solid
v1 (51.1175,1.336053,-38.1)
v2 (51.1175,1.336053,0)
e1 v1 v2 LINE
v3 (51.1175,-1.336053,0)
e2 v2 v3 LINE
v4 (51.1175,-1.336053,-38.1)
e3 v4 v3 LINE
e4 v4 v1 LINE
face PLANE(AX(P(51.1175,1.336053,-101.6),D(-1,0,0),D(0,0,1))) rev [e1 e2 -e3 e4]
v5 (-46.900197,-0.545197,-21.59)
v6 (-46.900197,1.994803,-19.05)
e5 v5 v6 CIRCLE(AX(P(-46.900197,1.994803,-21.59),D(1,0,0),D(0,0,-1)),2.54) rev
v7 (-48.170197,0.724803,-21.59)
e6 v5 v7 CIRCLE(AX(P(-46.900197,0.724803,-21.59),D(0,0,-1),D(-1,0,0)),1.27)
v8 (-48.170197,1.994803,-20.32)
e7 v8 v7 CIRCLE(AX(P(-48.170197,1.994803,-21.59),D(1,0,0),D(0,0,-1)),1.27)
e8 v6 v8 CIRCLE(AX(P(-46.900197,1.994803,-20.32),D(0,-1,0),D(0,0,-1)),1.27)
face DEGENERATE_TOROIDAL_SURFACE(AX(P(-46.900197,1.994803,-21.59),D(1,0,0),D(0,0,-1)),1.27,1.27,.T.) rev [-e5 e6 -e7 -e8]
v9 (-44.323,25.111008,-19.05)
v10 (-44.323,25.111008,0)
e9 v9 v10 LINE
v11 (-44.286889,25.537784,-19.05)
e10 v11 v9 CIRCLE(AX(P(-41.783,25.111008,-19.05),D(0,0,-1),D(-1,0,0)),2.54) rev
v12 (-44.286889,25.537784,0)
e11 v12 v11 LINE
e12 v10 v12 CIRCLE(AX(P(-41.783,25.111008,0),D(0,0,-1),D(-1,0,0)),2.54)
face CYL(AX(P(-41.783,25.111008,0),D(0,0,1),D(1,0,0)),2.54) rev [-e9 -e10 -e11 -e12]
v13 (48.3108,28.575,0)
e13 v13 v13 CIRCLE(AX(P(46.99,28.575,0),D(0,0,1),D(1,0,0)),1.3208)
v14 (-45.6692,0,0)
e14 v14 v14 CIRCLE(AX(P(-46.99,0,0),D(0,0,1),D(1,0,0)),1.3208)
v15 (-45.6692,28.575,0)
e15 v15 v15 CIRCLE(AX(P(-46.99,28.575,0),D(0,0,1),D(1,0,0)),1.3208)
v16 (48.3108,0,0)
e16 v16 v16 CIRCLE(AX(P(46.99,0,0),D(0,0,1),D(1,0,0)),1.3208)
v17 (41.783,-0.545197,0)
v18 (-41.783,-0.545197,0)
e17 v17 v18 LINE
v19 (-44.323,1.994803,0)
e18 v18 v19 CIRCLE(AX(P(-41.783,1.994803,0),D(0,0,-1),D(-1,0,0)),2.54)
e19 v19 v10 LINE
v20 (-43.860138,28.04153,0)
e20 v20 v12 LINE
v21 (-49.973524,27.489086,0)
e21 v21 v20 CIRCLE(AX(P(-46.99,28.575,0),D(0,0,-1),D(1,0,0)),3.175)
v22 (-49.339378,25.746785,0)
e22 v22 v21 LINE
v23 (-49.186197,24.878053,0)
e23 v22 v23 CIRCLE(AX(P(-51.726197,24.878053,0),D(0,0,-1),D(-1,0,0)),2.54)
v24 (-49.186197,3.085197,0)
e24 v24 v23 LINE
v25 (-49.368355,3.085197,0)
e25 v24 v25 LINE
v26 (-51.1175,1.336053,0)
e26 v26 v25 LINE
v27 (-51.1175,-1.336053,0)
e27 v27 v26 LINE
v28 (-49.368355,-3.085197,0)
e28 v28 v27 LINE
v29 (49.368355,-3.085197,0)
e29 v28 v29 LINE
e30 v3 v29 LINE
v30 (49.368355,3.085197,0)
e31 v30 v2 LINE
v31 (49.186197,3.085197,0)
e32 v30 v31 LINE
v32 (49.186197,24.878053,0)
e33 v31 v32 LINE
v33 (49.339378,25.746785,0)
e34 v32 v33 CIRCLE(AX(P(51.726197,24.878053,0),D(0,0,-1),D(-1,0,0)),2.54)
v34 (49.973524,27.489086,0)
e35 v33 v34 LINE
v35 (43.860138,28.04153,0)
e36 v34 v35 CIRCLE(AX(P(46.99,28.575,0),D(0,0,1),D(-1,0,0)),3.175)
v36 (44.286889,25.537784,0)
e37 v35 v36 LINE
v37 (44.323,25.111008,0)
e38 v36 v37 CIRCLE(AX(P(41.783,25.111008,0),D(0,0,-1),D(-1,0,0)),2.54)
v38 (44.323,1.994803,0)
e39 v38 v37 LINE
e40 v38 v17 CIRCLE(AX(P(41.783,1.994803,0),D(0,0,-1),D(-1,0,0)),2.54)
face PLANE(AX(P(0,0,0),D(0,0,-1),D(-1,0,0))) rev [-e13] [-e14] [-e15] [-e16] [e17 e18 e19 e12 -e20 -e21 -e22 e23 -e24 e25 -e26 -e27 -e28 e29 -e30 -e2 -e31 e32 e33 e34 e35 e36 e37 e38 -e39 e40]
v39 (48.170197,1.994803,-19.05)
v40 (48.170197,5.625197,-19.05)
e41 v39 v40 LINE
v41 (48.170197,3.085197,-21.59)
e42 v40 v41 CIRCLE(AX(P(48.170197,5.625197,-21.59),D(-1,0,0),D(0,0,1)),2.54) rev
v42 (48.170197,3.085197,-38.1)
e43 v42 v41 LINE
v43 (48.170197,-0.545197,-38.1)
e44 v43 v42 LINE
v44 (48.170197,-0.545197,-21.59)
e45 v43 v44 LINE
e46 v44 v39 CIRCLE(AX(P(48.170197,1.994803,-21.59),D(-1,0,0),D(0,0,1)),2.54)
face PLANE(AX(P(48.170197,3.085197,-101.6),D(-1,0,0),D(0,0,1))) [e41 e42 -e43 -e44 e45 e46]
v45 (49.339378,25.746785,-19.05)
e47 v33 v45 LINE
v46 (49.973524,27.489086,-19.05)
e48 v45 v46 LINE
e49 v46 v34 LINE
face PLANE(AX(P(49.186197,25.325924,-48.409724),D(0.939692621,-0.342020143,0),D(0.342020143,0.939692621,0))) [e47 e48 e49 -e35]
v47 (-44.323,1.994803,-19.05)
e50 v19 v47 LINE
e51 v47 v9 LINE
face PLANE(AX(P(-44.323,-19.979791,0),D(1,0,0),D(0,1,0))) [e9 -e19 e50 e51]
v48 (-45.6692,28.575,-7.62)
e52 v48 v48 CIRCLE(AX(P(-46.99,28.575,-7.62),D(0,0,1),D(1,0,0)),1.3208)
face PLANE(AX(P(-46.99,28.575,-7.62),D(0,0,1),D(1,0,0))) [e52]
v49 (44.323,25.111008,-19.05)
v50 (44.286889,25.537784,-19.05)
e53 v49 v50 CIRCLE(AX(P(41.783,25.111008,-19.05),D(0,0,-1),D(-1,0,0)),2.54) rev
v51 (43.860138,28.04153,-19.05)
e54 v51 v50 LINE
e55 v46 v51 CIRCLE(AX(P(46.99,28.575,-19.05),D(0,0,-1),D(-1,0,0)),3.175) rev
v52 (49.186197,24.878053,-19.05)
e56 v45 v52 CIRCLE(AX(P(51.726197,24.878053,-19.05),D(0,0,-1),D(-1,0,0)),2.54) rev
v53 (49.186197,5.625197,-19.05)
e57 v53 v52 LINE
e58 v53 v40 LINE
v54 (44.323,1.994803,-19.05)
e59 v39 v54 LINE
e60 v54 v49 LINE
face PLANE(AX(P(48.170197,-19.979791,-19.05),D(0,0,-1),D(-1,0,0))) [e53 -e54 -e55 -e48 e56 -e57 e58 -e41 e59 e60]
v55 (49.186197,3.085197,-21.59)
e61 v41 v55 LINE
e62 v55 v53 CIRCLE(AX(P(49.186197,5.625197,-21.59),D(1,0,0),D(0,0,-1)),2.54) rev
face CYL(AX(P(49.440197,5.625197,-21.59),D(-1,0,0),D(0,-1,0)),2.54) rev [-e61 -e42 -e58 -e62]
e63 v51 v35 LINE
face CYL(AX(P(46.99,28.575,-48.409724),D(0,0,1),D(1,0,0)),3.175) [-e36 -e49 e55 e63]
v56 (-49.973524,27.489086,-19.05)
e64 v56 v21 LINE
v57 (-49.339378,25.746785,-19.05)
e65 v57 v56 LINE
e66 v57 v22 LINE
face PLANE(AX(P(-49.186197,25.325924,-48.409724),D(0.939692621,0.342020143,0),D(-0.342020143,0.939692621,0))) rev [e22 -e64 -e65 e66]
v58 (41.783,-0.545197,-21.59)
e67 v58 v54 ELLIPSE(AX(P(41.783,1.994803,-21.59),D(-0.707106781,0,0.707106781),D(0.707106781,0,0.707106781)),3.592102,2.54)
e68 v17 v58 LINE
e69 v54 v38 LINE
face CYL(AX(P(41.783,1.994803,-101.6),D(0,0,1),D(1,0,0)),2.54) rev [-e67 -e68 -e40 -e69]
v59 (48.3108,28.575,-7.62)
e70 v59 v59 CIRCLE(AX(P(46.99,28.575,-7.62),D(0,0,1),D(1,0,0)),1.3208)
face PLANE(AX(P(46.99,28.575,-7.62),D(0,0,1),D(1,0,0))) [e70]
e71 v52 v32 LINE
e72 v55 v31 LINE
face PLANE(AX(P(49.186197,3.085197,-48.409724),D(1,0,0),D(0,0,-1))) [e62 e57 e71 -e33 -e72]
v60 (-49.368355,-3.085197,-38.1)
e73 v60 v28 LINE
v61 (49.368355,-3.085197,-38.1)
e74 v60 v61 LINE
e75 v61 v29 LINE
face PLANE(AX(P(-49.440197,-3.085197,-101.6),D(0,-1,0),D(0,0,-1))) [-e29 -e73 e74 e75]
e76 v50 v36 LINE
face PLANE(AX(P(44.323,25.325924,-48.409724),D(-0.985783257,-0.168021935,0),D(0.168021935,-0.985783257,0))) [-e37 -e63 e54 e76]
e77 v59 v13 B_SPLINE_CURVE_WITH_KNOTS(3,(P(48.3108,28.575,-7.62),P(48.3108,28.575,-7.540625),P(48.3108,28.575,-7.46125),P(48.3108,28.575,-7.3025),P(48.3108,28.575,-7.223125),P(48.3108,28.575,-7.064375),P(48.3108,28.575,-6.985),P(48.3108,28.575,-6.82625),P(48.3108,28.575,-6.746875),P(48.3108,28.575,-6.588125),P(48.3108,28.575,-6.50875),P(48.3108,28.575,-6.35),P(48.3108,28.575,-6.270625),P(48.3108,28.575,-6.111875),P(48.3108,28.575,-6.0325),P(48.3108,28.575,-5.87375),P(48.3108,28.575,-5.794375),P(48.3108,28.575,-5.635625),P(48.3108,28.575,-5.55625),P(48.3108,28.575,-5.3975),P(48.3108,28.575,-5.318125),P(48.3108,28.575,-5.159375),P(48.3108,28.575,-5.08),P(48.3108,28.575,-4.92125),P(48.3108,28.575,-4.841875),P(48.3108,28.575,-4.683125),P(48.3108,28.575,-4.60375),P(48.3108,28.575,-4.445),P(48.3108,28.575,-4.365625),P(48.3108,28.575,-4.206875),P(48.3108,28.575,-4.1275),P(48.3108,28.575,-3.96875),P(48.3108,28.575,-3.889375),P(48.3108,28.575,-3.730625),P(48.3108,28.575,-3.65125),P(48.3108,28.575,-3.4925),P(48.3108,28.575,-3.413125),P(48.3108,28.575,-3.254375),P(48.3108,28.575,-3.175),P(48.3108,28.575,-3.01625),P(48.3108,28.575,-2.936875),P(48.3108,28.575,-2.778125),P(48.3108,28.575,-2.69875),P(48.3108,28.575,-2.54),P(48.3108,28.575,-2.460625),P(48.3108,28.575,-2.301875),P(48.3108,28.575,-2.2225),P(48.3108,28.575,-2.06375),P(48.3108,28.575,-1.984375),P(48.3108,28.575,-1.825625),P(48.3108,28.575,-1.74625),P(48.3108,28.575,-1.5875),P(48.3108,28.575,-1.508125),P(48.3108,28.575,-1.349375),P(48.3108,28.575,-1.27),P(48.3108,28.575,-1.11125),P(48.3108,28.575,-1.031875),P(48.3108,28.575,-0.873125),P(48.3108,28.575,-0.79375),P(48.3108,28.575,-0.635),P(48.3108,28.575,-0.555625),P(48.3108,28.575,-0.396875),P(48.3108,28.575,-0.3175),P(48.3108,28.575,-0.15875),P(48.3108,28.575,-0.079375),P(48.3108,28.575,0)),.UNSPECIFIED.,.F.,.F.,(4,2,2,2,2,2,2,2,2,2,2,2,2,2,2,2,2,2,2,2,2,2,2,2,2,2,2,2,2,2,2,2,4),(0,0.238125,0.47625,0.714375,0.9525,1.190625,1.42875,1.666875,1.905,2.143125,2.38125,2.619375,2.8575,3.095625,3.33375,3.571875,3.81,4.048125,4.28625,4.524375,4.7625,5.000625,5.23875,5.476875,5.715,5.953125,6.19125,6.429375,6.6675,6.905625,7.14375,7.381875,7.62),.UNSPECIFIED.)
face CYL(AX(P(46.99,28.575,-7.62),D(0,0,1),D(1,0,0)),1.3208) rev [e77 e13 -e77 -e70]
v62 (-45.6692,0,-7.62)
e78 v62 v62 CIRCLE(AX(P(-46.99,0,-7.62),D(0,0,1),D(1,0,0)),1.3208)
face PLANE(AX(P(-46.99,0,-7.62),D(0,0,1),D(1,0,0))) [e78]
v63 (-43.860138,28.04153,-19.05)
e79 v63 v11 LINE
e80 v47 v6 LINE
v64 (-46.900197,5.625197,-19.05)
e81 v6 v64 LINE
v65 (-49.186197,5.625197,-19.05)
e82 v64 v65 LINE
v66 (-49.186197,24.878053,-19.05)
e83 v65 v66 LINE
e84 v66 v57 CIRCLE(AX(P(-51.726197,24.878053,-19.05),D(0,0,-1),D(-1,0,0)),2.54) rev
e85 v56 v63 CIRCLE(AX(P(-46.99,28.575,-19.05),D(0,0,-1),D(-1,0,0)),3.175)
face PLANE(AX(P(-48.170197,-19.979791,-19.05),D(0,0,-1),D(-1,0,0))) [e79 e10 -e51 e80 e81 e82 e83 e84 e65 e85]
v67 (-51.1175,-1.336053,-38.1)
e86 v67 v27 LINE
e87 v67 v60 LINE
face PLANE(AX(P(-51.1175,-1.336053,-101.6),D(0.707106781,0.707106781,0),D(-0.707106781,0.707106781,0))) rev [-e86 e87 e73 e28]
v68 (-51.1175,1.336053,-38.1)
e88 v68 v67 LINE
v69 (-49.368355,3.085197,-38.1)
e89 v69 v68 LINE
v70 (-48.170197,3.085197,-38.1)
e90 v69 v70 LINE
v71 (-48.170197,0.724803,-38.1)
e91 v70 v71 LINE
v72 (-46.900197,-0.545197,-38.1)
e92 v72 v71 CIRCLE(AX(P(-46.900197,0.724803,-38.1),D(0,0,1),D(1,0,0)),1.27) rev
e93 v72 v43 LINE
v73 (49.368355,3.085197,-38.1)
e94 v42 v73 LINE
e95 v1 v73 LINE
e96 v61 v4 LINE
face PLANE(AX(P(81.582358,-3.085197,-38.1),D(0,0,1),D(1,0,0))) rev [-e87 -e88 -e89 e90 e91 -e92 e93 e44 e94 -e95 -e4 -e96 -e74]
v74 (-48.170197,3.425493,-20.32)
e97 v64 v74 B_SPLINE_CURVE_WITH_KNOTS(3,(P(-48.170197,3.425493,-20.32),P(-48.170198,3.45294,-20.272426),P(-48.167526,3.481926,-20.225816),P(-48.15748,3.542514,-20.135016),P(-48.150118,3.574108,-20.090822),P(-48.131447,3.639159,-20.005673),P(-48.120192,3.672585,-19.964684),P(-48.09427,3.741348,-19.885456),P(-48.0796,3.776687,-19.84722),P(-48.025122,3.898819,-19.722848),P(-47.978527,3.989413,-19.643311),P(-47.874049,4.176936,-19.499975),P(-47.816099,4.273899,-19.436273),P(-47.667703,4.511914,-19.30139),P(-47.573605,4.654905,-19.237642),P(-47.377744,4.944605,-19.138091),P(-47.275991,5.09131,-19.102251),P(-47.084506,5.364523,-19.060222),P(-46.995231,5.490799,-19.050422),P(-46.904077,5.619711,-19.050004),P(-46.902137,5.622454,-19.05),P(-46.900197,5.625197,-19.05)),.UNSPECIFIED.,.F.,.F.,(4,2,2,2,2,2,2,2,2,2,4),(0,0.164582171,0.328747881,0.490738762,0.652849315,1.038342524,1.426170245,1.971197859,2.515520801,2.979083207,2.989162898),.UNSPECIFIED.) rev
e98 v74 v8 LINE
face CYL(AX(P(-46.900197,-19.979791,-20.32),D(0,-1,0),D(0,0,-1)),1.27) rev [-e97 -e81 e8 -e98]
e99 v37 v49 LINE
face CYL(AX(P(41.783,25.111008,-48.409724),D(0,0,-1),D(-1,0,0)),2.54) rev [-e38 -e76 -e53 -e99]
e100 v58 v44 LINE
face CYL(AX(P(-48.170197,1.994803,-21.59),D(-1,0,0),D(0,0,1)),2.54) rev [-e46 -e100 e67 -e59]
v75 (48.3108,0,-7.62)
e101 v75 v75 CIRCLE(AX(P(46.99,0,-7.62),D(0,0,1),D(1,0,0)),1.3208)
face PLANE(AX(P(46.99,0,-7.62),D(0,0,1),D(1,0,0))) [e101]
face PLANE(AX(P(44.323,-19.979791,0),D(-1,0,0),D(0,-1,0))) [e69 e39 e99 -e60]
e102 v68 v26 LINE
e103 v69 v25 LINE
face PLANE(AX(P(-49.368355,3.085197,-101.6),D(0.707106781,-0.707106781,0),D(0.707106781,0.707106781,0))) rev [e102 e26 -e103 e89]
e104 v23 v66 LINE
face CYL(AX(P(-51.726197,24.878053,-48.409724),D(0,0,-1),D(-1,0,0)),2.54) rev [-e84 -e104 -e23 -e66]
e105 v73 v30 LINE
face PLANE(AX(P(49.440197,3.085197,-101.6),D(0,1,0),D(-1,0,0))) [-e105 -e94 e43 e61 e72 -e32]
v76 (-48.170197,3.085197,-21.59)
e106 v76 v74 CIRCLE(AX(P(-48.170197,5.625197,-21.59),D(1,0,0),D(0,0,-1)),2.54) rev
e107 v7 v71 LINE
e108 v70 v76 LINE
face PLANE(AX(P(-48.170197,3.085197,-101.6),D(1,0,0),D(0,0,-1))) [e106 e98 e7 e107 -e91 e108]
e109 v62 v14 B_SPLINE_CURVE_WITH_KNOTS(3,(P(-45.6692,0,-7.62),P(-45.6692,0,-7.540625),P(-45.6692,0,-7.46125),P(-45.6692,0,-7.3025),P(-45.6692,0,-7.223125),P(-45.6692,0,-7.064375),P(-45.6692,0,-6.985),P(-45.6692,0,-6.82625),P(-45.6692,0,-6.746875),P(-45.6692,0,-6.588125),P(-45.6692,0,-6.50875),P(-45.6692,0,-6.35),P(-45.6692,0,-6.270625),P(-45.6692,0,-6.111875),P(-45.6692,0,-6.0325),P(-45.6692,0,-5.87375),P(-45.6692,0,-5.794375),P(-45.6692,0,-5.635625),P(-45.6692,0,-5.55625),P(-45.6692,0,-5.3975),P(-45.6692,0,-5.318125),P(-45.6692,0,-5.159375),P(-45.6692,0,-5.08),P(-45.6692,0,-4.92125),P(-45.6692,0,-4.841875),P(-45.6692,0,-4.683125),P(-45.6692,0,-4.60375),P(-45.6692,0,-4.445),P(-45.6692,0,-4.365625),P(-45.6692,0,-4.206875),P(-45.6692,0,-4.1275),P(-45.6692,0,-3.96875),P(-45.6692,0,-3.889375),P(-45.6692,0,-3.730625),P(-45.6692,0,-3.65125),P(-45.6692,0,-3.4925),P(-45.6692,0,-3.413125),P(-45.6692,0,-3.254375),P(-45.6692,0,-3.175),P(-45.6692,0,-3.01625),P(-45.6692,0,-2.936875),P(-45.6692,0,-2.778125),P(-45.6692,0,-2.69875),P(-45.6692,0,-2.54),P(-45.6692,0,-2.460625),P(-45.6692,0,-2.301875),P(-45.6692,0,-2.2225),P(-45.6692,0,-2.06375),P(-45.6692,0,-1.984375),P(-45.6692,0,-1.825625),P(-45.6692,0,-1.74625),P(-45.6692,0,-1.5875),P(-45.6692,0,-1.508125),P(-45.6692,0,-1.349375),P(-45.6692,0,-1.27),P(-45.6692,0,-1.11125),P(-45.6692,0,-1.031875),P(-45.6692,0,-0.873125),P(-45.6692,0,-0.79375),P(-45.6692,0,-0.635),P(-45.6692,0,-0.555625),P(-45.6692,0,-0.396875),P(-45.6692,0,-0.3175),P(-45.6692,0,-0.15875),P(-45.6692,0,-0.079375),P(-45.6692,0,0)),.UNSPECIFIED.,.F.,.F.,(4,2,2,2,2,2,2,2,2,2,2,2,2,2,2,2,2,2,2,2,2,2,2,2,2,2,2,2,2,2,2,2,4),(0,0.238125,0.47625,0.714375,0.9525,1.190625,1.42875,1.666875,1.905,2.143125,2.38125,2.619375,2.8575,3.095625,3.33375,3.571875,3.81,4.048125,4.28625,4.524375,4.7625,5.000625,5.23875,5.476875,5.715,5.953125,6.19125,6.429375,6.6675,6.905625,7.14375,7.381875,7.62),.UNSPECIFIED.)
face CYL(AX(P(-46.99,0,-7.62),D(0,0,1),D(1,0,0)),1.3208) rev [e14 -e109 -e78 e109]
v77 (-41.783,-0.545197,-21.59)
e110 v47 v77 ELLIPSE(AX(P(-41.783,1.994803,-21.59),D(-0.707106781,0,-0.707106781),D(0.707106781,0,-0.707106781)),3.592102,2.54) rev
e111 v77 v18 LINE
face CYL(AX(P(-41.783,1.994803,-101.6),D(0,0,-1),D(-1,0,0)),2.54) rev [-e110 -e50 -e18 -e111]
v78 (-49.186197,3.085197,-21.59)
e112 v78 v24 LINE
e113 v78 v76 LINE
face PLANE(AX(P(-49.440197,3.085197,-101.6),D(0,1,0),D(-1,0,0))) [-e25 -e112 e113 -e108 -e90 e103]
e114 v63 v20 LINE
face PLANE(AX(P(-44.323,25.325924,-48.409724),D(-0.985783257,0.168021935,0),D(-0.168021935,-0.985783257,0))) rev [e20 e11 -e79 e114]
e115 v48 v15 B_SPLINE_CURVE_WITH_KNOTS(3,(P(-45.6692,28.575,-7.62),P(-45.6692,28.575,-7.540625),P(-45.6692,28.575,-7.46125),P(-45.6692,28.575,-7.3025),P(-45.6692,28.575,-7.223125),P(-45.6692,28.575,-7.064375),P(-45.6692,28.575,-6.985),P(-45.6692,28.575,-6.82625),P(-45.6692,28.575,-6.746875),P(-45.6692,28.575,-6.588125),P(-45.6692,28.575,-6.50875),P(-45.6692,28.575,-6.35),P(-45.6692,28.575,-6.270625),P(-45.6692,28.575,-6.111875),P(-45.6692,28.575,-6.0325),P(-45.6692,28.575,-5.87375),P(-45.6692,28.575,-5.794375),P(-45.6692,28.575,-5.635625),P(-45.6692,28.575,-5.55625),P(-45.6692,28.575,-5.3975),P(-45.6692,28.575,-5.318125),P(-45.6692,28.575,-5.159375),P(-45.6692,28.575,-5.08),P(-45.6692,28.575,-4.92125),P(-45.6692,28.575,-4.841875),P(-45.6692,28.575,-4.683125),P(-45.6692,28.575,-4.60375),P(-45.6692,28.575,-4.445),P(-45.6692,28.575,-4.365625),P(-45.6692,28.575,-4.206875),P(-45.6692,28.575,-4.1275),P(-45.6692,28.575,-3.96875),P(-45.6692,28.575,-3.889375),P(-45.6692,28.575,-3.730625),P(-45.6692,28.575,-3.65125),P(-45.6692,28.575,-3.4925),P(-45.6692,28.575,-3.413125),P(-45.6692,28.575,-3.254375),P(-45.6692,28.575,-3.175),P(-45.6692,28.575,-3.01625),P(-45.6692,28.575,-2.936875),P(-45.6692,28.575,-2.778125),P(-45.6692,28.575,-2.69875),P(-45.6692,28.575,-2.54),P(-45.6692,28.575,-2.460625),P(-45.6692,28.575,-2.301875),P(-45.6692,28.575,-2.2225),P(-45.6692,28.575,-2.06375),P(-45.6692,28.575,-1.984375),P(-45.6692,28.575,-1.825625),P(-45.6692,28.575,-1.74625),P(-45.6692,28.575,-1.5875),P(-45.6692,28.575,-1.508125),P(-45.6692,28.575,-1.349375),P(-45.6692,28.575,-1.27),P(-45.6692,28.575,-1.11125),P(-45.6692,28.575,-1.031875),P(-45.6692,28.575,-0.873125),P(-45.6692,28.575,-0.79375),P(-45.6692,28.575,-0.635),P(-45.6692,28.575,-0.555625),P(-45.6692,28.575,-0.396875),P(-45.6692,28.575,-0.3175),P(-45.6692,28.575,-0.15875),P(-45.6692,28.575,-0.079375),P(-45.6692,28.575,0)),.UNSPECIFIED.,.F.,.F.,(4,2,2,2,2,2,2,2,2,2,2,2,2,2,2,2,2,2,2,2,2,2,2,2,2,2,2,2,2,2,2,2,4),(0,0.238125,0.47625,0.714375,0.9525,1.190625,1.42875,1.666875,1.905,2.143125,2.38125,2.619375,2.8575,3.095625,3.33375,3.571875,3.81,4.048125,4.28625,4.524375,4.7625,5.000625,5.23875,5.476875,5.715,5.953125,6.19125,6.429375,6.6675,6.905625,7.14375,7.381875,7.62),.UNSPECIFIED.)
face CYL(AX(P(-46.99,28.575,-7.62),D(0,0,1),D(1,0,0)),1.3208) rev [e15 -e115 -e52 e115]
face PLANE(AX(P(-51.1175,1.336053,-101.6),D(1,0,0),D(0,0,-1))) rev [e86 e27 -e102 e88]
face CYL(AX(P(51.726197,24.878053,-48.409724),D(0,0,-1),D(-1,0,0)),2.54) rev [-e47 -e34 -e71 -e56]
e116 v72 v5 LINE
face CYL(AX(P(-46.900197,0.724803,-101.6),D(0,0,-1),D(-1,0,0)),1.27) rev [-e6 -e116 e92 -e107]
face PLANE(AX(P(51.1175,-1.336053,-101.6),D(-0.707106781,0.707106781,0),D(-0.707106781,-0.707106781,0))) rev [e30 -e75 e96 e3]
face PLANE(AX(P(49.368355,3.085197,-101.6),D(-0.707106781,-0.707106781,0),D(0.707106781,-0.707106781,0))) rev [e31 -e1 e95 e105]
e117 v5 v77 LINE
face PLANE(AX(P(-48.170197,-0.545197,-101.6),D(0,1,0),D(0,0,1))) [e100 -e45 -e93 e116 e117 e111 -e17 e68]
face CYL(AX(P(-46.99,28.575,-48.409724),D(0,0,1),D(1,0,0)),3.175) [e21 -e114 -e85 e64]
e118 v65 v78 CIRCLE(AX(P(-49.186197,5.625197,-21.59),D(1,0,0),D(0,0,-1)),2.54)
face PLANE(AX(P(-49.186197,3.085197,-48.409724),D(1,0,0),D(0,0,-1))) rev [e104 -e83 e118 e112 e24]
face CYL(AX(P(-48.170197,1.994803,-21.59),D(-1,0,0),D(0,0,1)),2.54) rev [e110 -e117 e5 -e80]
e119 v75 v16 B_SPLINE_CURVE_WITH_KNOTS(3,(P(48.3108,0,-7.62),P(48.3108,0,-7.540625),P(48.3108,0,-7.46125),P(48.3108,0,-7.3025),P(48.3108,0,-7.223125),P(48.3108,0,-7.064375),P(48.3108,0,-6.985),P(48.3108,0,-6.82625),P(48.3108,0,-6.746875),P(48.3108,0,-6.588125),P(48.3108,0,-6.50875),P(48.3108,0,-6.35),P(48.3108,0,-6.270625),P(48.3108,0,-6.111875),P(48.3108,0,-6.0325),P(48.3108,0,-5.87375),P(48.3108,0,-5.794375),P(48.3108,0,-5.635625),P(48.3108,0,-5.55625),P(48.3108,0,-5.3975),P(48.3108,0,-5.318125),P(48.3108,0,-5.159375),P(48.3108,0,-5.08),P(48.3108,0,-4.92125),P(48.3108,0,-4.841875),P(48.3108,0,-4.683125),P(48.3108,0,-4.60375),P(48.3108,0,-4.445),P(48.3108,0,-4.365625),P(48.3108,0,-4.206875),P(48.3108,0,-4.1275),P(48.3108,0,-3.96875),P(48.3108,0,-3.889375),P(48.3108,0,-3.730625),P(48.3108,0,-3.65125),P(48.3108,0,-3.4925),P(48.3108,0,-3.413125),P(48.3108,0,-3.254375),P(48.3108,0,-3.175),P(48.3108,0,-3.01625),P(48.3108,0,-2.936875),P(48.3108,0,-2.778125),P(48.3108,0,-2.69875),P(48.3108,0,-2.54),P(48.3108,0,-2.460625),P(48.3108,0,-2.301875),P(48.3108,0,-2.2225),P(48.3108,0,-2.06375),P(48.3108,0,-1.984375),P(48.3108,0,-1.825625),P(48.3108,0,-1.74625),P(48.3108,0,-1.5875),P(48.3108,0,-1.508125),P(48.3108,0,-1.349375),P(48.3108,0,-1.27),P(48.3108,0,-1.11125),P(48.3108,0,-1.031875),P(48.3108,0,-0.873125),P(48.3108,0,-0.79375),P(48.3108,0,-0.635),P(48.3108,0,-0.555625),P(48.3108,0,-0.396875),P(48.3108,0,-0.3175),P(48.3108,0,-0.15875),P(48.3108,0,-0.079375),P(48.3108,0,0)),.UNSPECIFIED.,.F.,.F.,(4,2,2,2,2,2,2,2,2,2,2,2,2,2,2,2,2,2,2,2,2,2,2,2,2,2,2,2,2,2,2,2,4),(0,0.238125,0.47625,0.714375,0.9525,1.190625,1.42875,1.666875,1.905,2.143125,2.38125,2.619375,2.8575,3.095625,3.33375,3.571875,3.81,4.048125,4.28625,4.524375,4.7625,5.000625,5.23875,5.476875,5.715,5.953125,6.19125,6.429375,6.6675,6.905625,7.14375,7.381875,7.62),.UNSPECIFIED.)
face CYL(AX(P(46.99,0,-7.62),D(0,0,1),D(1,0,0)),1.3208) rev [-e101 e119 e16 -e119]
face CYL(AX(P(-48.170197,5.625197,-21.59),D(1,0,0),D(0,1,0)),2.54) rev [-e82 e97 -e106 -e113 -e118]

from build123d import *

# Parameters (mm, degrees)
BOSS_EXTRUDE1_DEPTH      = 101.6
SKETCH3_W                = 19.05
SKETCH3_H                = 15.24
BOSS_EXTRUDE3_DEPTH      = 2.54
BOSS_EXTRUDE4_DEPTH      = 3.175
SKETCH5_R                = 3.96875
CUT_EXTRUDE1_DEPTH       = 113.522583006
SKETCH18_W               = 3.847197439
SKETCH18_H               = 19.05
BOSS_EXTRUDE9_DEPTH      = 3.630394878
BOSS_EXTRUDE17_DEPTH     = 19.05
SKETCH20_R               = 1.3208
CUT_EXTRUDE7_DEPTH       = 7.62
FILLET3_R                = 2.54
FILLET4_R                = 2.54
CUT_EXTRUDE19_DEPTH      = 119.165702994
FILLET12_R               = 0.508
FILLET24_R               = 1.27
CUT_EXTRUDE20_DEPTH      = 119.230869843
CUT_EXTRUDE20_DEPTH_BACK = 119.230869843
SKETCH41_W               = 159.957489038
SKETCH41_H               = 86.494386596


with BuildPart() as part:
    # Sketch1 → Boss-Extrude1 (new body)
    with BuildSketch(Plane.XY):
        Polygon((-49.440197439, 3.085197439), (-51.308, 1.217394878), (-51.308, -1.217394878), (-49.440197439, -3.085197439), (49.440197439, -3.085197439), (51.308, -1.217394878), (51.308, 1.217394878), (49.440197439, 3.085197439), (48.170197439, 3.085197439), (48.170197439, -0.545197439), (-48.170197439, -0.545197439), (-48.170197439, 3.085197439), align=None)
    extrude(amount=-BOSS_EXTRUDE1_DEPTH)

    # Sketch3 → Boss-Extrude3 (add)
    with BuildSketch(Plane(origin=(0, 0, -101.6), x_dir=(-1, 0, 0), z_dir=(0, 0, -1))):
        with Locations((38.645197439, 7.074802561)):
            Rectangle(SKETCH3_W, SKETCH3_H)
    extrude(amount=-BOSS_EXTRUDE3_DEPTH)

    # Sketch4 → Boss-Extrude4 (add)
    with BuildSketch(Plane(origin=(-29.120197439, 0, 0), x_dir=(0, 0, -1), z_dir=(1, 0, 0))):
        Polygon((99.06, 14.694802561), (83.82, -0.545197439), (99.06, -0.545197439), align=None)
    boss_extrude4 = extrude(amount=-BOSS_EXTRUDE4_DEPTH)

    # Mirror1: Boss-Extrude4 across plane
    add(boss_extrude4.mirror(Plane(origin=(-38.645197439, 0, 0), x_dir=(0, 0, 1), z_dir=(1, 0, 0))))

    # Sketch5 → Cut-Extrude1 (cut, through all)
    with BuildSketch(Plane.XY.offset(-99.06)):
        with Locations((-38.6334, 6.985)):
            Circle(SKETCH5_R)
    extrude(amount=-CUT_EXTRUDE1_DEPTH, mode=Mode.SUBTRACT)

    # Sketch18 → Boss-Extrude9 (add)
    with BuildSketch(Plane(origin=(0, 3.085197439, 0), x_dir=(1, 0, 0), z_dir=(0, 1, 0))):
        with Locations((46.246598719, 9.525)):
            Rectangle(SKETCH18_W, SKETCH18_H)
        with Locations((-46.246598719, 9.525)):
            Rectangle(SKETCH18_W, SKETCH18_H)
    extrude(amount=-BOSS_EXTRUDE9_DEPTH)

    # Sketch39 → Boss-Extrude17 (add)
    with BuildSketch(Plane.XY):
        with BuildLine():
            Line((49.186197439, 3.085197439), (44.323, 3.085197439))
            Line((44.323, 3.085197439), (44.323, 25.325923901))
            Line((44.323, 25.325923901), (43.86013816, 28.041530355))
            ThreePointArc((43.86013816, 28.041530355), (47.275748779, 31.737115215), (49.973524071, 27.489086045))
            Line((49.973524071, 27.489086045), (49.186197439, 25.325923901))
            Line((49.186197439, 25.325923901), (49.186197439, 3.085197439))
        make_face()
    boss_extrude17 = extrude(amount=-BOSS_EXTRUDE17_DEPTH)

    # Mirror5: Boss-Extrude17 across plane
    add(boss_extrude17.mirror(Plane(origin=(0, 0, 0), x_dir=(0, 0, 1), z_dir=(1, 0, 0))))

    # Sketch20 → Cut-Extrude7 (cut)
    with BuildSketch(Plane.XY):
        with Locations((46.99, 0)):
            Circle(SKETCH20_R)
        with Locations((-46.99, 0)):
            Circle(SKETCH20_R)
        with Locations((-46.99, 28.575)):
            Circle(SKETCH20_R)
        with Locations((46.99, 28.575)):
            Circle(SKETCH20_R)
    extrude(amount=-CUT_EXTRUDE7_DEPTH, mode=Mode.SUBTRACT)

    # Fillet3
    fillet3_edges = [part.edges().sort_by_distance(p)[0] for p in [
        (44.323, 25.325923901, -9.525),
        (49.186197439, 25.325923901, -9.525),
        (-49.186197439, 25.325923901, -9.525),
        (-44.323, 25.325923901, -9.525),
    ]]
    fillet(fillet3_edges, radius=FILLET3_R)

    # Fillet4
    fillet4_edges = [part.edges().sort_by_distance(p)[0] for p in [
        (48.678197439, 3.085197439, -19.05),
        (-48.678197439, 3.085197439, -19.05),
        (44.323, -0.545197439, -9.525),
        (46.246598719, -0.545197439, -19.05),
        (-46.246598719, -0.545197439, -19.05),
        (-44.323, -0.545197439, -9.525),
    ]]
    fillet(fillet4_edges, radius=FILLET4_R)

    # Sketch40 → Cut-Extrude19 (cut, through all)
    with BuildSketch(Plane.XY):
        Polygon((-49.36835539, 3.085197439), (-51.1175, 1.336052829), (-51.1175, -1.336052829), (-49.36835539, -3.085197439), (-52.3875, -3.085197439), (-52.3875, 3.085197439), align=None)
        Polygon((52.3875, 3.085197439), (52.3875, -3.085197439), (49.36835539, -3.085197439), (51.1175, -1.336052829), (51.1175, 1.336052829), (49.36835539, 3.085197439), align=None)
    extrude(amount=-CUT_EXTRUDE19_DEPTH, mode=Mode.SUBTRACT)

    # Fillet12
    # the kernel refuses this fillet: 0.508 mm, written as the material it adds along each edge
    with BuildSketch(Plane(origin=(-48.170197439, 3.085197439, -86.180394878), x_dir=(-1, 0, 0), z_dir=(0, 0, -1))) as fillet12_piece_1_section:
        with BuildLine():
            CenterArc((FILLET12_R, FILLET12_R), FILLET12_R, 180, 90)
            Line((0, FILLET12_R), (0, 0))
            Line((0, 0), (FILLET12_R, 0))
        make_face()
    fillet12_piece_1 = extrude(amount=15.419605122, mode=Mode.PRIVATE)
    fillet12_piece_1 = split(fillet12_piece_1, bisect_by=Plane(origin=(-48.284048629, 6.707217092, -91.072414531), z_dir=(0, -0.7071067811865475, -0.7071067811865476)), keep=Keep.TOP, mode=Mode.PRIVATE)
    add(fillet12_piece_1)

    # Fillet24
    fillet24_edges = [part.edges().sort_by_distance(p)[0] for p in [
        (-48.170197439, 3.81, -19.05),
        (-48.170197439, 0.198751337, -19.793948776),
        (-48.170197439, -0.545197439, -52.705),
    ]]
    fillet(fillet24_edges, radius=FILLET24_R)

    # Sketch41 → Cut-Extrude20 (cut, two sides: drawn at the far end of the back side and taken through both)
    with BuildSketch(Plane(origin=(0, -0.545197439, 0), x_dir=(1, 0, 0), z_dir=(0, 1, 0)).offset(-CUT_EXTRUDE20_DEPTH_BACK)):
        with Locations((1.60361347, 81.347193298)):
            Rectangle(SKETCH41_W, SKETCH41_H)
    extrude(amount=CUT_EXTRUDE20_DEPTH + CUT_EXTRUDE20_DEPTH_BACK, mode=Mode.SUBTRACT)


solid = part.part
